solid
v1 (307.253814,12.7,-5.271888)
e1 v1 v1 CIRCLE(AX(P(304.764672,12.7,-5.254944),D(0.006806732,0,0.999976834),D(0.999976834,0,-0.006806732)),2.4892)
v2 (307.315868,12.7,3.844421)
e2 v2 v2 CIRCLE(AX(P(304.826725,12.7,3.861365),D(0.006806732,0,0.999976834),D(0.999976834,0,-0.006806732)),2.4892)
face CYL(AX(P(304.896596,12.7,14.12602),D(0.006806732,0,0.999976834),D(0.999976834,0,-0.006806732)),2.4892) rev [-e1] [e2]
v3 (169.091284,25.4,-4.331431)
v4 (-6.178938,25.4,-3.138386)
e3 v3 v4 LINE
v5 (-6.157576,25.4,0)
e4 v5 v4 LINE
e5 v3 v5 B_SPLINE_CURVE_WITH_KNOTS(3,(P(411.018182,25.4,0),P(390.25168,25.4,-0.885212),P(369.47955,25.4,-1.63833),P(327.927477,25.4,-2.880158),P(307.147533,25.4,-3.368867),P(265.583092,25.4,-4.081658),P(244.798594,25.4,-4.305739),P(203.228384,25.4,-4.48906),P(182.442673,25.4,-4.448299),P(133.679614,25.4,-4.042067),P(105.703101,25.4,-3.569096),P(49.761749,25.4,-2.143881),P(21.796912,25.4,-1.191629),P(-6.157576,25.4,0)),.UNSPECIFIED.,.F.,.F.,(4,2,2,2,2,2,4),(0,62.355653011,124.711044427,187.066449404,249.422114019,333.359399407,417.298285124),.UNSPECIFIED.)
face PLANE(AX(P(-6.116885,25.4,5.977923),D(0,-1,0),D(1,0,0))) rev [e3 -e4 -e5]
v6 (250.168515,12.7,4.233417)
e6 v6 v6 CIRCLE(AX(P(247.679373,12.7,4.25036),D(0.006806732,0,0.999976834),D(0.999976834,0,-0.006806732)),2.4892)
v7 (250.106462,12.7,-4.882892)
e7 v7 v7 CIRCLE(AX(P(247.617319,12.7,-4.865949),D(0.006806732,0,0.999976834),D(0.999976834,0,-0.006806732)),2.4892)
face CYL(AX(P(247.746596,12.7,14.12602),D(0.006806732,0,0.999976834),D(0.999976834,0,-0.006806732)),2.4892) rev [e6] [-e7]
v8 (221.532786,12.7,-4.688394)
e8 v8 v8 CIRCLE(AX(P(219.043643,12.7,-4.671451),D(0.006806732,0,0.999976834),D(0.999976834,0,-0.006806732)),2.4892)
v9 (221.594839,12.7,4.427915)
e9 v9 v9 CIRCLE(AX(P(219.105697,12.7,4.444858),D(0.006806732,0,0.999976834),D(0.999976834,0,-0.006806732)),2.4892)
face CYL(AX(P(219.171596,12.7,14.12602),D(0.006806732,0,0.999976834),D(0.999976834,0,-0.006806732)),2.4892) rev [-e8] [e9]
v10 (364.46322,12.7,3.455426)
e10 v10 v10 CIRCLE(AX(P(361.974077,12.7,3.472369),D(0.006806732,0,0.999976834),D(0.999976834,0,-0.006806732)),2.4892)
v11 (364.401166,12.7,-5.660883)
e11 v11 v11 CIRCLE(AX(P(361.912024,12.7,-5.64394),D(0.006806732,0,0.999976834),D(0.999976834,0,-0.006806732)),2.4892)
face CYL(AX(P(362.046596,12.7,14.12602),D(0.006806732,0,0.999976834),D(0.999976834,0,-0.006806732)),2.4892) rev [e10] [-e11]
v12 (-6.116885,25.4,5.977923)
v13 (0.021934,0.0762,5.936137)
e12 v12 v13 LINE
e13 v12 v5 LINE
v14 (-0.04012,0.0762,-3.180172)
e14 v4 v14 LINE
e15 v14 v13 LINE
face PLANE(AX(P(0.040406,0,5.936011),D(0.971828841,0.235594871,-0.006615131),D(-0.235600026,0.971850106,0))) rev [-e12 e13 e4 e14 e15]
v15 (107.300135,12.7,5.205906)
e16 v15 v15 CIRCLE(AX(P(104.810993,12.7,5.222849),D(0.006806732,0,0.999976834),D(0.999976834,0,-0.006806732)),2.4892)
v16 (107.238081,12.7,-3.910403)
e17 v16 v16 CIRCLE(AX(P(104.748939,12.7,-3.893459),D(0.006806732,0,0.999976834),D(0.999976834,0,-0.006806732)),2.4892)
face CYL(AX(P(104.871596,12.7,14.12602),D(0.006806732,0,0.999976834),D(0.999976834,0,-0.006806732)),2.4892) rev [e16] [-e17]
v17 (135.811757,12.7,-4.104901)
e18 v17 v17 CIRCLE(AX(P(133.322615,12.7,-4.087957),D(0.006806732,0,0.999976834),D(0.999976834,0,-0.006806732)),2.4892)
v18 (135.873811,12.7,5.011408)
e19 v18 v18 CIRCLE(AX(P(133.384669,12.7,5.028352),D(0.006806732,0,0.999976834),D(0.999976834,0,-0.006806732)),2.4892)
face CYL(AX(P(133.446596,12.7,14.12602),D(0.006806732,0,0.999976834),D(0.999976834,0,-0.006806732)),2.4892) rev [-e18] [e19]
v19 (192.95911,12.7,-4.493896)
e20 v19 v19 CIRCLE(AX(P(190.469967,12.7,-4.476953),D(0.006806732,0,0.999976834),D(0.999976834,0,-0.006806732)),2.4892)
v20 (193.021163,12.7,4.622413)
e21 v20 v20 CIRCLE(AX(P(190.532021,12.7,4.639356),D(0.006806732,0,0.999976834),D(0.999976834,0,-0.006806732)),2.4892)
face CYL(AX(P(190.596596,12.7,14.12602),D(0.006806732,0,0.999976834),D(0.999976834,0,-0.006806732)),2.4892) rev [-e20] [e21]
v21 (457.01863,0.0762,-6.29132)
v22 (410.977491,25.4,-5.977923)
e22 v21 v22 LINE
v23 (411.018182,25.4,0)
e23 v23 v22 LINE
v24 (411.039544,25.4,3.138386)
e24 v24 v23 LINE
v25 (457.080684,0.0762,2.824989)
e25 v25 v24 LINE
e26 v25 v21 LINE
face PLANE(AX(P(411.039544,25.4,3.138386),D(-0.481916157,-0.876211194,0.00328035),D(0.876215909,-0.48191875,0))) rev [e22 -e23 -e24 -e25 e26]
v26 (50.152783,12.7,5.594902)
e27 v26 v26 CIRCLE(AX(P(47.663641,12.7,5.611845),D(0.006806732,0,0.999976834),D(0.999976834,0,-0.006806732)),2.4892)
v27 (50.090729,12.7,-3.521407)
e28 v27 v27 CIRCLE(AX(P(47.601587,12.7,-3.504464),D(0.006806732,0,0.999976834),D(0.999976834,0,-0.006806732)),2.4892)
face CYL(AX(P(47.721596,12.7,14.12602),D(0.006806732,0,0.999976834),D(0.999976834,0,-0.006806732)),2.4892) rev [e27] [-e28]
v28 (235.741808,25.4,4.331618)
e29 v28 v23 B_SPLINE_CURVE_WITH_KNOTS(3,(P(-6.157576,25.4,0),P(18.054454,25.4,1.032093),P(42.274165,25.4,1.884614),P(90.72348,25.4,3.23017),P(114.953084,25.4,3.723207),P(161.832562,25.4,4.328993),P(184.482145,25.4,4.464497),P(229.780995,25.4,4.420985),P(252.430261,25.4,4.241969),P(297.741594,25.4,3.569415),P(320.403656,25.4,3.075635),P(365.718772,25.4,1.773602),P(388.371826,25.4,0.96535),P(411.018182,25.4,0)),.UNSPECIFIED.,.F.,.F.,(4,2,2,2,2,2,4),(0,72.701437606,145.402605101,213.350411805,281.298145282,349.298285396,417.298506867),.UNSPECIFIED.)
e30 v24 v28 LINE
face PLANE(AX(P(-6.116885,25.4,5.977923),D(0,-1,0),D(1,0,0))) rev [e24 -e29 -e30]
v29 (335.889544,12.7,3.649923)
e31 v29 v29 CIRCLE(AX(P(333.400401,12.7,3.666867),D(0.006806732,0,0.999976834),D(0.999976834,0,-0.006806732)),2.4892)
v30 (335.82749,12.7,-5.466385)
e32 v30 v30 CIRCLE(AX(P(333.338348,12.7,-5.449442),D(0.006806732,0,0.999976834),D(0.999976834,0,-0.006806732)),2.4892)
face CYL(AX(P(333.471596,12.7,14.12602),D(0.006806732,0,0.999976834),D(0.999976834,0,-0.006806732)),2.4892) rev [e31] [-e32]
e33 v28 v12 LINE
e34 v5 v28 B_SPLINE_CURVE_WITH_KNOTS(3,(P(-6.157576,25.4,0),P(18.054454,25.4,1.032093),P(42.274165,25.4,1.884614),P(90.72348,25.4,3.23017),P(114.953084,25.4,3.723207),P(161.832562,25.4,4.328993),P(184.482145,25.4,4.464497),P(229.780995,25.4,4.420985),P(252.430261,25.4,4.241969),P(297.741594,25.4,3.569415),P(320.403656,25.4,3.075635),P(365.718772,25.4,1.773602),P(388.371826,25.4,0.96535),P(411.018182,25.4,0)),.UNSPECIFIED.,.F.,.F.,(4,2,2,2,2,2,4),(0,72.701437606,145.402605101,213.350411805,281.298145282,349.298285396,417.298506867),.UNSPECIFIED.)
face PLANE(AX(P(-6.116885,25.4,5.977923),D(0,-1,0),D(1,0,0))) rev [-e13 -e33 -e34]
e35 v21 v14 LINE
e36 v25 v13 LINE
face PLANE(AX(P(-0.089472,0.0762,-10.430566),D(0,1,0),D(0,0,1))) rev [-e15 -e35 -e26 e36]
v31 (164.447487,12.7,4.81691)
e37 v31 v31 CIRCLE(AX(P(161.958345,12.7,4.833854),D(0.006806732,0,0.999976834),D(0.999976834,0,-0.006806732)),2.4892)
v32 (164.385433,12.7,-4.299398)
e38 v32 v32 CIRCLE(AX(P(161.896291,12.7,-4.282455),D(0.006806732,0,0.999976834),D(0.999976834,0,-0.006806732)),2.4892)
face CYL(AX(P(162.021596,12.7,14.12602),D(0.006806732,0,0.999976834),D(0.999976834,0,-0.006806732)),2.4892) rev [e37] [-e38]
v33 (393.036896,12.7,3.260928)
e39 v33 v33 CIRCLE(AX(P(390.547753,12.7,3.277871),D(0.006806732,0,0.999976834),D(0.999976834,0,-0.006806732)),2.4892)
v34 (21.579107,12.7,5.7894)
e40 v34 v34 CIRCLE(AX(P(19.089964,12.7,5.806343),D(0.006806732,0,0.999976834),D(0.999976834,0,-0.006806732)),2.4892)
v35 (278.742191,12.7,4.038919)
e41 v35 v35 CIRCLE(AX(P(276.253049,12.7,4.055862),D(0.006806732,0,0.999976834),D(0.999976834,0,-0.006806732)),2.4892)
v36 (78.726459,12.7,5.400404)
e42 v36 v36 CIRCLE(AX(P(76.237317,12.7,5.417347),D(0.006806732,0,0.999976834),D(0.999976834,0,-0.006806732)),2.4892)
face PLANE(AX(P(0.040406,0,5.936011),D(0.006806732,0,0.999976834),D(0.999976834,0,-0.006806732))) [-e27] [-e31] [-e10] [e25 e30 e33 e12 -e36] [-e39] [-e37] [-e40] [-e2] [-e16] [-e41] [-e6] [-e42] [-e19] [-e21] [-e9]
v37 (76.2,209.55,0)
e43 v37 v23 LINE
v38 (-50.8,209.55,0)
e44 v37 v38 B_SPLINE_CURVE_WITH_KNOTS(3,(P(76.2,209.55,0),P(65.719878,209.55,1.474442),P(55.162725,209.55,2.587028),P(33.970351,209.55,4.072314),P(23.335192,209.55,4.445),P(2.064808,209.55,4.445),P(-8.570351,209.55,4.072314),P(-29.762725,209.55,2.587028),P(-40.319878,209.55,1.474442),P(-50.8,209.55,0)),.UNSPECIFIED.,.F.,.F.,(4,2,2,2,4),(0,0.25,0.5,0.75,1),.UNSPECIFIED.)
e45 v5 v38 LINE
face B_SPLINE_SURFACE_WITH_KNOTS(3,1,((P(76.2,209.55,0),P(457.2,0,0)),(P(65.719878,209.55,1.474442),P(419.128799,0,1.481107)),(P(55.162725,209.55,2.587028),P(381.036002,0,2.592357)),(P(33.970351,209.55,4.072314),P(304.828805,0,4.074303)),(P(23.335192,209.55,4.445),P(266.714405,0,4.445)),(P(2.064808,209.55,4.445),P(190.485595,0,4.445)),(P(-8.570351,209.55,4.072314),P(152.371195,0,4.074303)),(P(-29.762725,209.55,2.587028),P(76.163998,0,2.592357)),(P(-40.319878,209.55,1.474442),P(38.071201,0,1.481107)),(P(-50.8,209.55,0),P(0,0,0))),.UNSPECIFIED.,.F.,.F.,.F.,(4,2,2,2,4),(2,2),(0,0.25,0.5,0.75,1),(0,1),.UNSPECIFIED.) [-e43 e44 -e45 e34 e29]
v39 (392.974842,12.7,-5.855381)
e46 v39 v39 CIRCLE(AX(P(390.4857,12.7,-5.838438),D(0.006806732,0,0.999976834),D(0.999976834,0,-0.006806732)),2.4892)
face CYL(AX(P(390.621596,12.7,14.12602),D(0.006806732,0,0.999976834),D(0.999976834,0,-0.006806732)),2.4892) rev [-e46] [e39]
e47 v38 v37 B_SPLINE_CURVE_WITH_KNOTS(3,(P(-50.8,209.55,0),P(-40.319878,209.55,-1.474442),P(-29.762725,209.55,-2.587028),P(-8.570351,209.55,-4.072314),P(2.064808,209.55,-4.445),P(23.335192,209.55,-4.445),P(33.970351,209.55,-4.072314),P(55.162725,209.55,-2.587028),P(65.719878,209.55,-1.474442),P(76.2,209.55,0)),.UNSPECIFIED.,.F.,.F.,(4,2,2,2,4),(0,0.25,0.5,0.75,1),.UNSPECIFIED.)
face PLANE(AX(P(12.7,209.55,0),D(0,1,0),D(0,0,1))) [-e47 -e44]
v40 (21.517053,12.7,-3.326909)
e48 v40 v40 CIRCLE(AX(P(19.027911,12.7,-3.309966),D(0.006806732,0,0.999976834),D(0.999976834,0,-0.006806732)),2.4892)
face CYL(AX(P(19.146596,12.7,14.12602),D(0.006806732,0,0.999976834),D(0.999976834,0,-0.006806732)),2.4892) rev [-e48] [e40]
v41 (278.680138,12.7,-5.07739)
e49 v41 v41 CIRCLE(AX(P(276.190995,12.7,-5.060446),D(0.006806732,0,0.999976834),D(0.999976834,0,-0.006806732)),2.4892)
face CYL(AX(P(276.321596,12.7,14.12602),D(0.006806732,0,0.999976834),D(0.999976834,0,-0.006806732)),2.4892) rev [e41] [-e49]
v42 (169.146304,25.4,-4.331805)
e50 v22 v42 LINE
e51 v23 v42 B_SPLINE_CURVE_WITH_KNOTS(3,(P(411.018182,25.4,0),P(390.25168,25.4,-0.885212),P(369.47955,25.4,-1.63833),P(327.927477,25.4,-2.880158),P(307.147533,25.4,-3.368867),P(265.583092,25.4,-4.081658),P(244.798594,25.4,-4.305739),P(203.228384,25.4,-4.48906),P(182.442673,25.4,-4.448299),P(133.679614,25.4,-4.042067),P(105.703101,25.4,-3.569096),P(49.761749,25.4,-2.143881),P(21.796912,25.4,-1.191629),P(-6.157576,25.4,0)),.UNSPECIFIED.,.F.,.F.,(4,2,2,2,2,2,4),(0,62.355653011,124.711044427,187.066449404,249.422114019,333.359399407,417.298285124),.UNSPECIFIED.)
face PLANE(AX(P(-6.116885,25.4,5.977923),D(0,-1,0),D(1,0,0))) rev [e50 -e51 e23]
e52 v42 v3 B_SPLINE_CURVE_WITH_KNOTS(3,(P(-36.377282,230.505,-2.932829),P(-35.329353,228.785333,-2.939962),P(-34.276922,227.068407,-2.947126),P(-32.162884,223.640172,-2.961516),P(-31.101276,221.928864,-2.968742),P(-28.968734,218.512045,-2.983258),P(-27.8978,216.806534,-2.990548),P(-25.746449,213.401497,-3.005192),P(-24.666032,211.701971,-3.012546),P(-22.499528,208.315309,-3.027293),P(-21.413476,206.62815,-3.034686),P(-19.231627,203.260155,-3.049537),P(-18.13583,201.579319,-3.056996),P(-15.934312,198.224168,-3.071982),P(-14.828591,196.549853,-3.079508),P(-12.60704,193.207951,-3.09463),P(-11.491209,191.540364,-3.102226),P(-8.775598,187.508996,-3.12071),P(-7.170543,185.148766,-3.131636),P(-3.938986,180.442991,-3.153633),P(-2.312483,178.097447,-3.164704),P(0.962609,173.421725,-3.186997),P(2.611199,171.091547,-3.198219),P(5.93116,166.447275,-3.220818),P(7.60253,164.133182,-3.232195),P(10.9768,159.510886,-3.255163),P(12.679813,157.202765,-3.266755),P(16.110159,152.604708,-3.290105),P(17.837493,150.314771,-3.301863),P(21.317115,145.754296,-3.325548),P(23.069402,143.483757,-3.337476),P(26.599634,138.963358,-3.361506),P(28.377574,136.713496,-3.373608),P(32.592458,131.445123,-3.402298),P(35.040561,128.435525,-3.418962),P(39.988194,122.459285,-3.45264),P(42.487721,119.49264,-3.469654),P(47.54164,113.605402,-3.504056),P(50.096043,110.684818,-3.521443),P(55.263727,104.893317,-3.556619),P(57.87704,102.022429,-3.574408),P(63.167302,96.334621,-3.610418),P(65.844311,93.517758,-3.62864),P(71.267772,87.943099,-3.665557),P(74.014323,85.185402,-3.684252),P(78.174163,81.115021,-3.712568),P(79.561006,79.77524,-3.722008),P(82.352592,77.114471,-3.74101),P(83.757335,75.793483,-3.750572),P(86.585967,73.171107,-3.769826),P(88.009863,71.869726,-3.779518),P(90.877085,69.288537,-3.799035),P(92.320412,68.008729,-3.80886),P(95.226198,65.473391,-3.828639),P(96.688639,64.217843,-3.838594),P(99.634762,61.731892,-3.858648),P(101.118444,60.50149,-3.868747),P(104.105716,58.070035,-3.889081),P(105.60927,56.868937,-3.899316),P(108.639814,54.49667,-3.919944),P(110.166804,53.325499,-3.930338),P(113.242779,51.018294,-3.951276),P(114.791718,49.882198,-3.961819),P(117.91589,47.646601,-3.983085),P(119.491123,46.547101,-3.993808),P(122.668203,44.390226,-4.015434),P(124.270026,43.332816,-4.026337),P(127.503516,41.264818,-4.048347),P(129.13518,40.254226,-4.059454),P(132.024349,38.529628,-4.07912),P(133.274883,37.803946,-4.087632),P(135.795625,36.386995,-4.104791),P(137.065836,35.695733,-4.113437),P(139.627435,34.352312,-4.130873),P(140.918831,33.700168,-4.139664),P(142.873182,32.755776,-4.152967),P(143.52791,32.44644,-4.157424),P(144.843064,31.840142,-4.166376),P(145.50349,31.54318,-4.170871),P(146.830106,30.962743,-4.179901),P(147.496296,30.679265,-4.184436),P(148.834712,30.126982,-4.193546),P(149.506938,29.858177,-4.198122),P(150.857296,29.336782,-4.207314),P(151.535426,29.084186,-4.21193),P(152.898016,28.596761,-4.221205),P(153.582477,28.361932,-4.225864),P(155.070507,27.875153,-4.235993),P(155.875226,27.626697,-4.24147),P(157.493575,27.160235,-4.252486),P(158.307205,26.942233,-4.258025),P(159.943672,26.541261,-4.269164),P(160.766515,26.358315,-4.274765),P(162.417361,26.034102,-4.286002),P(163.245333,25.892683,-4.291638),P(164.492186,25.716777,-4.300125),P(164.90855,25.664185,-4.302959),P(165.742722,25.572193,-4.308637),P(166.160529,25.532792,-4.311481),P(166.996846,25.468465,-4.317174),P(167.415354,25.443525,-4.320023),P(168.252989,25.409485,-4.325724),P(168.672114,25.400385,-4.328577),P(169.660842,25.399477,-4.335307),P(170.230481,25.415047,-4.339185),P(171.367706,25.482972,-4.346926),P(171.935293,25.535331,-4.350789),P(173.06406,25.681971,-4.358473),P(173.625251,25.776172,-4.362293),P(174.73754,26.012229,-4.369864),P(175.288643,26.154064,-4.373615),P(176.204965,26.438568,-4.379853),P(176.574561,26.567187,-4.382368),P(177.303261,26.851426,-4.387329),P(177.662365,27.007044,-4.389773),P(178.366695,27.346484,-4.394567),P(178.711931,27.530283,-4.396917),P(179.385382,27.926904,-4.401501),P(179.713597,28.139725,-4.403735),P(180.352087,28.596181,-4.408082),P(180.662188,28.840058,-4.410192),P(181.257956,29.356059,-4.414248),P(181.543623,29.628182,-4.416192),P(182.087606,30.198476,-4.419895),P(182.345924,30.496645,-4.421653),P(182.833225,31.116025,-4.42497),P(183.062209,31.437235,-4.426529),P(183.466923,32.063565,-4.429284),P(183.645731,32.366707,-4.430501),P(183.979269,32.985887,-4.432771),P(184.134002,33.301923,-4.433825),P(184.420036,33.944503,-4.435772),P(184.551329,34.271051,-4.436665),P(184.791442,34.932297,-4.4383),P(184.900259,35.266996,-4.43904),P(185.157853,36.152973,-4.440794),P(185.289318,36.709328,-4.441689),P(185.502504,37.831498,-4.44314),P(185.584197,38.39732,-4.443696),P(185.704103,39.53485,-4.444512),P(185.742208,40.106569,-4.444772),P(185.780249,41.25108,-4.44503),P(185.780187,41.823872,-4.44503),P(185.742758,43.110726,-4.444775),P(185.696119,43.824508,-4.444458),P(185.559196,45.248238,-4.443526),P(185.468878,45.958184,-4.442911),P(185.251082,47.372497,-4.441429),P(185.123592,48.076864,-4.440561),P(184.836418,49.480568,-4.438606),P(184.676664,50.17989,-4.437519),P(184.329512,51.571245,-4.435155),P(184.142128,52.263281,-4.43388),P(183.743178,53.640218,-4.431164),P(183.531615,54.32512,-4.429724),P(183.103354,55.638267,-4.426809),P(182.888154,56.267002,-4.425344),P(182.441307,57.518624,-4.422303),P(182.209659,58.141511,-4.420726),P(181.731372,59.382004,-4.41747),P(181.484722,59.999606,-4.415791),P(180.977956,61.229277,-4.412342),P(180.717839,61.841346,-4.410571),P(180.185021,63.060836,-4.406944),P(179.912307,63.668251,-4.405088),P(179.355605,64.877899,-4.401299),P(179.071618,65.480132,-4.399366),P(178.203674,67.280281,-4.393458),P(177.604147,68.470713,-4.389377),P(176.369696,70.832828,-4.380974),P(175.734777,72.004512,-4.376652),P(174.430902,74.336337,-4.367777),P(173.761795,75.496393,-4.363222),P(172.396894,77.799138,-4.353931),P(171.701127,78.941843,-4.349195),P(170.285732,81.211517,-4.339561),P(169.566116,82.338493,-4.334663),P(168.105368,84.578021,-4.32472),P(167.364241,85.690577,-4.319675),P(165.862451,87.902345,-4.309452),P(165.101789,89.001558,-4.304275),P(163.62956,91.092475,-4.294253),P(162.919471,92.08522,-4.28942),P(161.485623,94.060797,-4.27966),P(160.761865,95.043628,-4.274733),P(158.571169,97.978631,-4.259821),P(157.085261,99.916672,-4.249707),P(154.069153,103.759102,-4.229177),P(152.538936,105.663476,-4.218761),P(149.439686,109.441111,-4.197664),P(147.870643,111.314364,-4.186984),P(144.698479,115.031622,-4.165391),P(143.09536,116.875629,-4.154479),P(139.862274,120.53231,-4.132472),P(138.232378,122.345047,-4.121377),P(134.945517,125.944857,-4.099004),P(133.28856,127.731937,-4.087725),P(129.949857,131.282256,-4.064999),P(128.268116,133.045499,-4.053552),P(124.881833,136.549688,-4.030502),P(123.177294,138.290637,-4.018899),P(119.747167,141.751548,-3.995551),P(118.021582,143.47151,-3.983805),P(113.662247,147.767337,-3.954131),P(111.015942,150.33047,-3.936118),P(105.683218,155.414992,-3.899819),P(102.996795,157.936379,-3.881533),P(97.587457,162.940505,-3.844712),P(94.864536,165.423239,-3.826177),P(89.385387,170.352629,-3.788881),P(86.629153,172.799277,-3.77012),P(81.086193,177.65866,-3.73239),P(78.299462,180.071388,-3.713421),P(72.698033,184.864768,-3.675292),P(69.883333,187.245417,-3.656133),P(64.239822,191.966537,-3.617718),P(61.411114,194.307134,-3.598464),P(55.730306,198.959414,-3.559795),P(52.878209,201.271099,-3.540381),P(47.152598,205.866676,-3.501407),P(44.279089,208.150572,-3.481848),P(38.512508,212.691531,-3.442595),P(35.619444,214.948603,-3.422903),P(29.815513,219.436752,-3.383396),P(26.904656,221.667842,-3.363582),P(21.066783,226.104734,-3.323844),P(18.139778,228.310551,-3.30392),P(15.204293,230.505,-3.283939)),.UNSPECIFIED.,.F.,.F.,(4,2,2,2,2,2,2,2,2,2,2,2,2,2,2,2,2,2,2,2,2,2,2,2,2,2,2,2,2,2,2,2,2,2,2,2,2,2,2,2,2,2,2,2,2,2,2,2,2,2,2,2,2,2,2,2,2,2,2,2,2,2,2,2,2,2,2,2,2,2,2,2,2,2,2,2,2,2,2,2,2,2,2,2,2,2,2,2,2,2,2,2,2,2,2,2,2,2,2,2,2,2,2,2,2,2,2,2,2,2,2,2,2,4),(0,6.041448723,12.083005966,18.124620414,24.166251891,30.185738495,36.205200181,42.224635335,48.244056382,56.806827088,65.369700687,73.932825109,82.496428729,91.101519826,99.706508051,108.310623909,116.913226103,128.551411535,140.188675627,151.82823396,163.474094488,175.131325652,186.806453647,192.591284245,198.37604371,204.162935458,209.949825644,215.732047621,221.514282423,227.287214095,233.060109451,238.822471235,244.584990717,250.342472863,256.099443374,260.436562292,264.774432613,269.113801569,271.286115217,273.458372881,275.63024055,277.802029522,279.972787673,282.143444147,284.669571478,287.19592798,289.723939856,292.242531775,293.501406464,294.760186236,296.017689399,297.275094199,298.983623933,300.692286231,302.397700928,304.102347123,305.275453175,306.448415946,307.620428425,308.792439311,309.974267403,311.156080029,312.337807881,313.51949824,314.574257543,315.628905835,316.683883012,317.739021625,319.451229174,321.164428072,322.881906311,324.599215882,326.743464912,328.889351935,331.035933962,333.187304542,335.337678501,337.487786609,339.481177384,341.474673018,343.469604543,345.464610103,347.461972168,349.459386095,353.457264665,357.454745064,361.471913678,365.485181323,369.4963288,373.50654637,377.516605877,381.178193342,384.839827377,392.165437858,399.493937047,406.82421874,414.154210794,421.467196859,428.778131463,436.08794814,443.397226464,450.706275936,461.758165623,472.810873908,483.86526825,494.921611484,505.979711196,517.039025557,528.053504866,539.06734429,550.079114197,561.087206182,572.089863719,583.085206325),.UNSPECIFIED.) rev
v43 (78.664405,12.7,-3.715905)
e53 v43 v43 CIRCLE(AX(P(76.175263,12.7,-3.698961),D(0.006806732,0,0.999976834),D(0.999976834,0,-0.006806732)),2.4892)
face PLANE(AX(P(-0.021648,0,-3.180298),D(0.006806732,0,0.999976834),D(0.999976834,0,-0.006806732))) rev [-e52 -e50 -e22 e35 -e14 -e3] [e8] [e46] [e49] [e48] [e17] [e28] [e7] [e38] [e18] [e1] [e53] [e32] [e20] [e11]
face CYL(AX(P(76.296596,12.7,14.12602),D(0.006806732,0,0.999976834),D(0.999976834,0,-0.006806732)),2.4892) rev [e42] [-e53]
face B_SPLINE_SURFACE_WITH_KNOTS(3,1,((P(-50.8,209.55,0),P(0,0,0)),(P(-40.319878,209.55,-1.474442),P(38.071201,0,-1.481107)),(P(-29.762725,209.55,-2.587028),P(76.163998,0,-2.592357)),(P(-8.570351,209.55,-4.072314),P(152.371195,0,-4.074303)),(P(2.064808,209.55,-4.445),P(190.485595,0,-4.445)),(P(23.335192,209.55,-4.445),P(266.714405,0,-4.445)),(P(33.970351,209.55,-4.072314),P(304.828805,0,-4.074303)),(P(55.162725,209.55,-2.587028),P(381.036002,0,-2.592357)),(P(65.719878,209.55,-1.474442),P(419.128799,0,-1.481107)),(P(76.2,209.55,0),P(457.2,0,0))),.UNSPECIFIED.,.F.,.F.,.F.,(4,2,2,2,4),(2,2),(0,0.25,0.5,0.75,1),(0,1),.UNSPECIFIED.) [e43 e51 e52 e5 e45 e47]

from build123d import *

# Parameters (mm, degrees)
BOSS_EXTRUDE1_DEPTH     = 9.116519994
CUT_EXTRUDE1_DEPTH      = 503.991265391
CUT_EXTRUDE1_DEPTH_BACK = 503.991265391
SKETCH12_W              = 6.35
SKETCH12_H              = 25.4
F_10_CLEARANCE_HOLE1_D  = 4.9784
LPATTERN1_START         = -3.180371244
LPATTERN1_OUTLINE_R     = 2.4892
LPATTERN1_DEPTH         = 9.116519994
SKETCH14_W              = 457.207880774
SKETCH14_H              = 25.4
CUT_EXTRUDE2_DEPTH      = 504.063817152


# Read off the part's stored shape, not the designer's step: LPattern1
with BuildPart() as part:
    # Sketch5 for Loft4 → Loft4 section 0
    with BuildSketch(Plane(origin=(0, 209.55, 0), x_dir=(1, 0, 0), z_dir=(0, 1, 0))):
        with BuildLine():
            # circular arc as an exact rational Bezier (weights 1, cos(half-angle), 1)
            Bezier((-50.8, 0), (12.7, 8.9337755), (76.2, 0), weights=[1, 0.990247786, 1])
            Bezier((76.2, 0), (12.7, -8.9337755), (-50.8, 0), weights=[1, 0.990247786, 1])
        make_face()
    # Sketch1 for Loft4 → Loft4 section 1
    with BuildSketch(Plane(origin=(0, 0, 0), x_dir=(1, 0, 0), z_dir=(0, 1, 0))):
        with BuildLine():
            Bezier((0, 0), (228.6, 8.89336246), (457.2, 0), weights=[1, 0.999244113, 1])
            Bezier((457.2, 0), (228.6, -8.89336246), (0, 0), weights=[1, 0.999244113, 1])
        make_face()
    loft()

    # Sketch10 → Boss-Extrude1 (add)
    with BuildSketch(Plane(origin=(-0.021647933, 0, -3.180297568), x_dir=(0, -1, 0), z_dir=(0.006806731520561807, 0, 0.9999768339346702))):
        Polygon((0, 457.189408475), (0, 0), (-25.4, -6.157433111), (-25.4, 411.008660144), align=None)
    extrude(amount=BOSS_EXTRUDE1_DEPTH)

    # Sketch12 → Cut-Extrude1 (cut, two sides: drawn at the far end of the back side and taken through both)
    with BuildSketch(Plane(origin=(0, 0, 0), x_dir=(0.006806731520561808, 0, 0.9999768339346703), z_dir=(-0.9999768339346703, 0, 0.006806731520561808)).offset(-CUT_EXTRUDE1_DEPTH_BACK)):
        with Locations((9.11114875, 12.7)):
            Rectangle(SKETCH12_W, SKETCH12_H)
        with Locations((-6.355371244, 12.7)):
            Rectangle(SKETCH12_W, SKETCH12_H)
    extrude(amount=CUT_EXTRUDE1_DEPTH + CUT_EXTRUDE1_DEPTH_BACK, mode=Mode.SUBTRACT)

    # #10 Clearance Hole1 (through all)
    with Locations(Plane(origin=(0.097036893, 0, 14.25568857), x_dir=(0, -1, 0), z_dir=(0.006806731520561807, 0, 0.9999768339346702))):
        with Locations((-12.7, 19.05)):
            Hole(F_10_CLEARANCE_HOLE1_D / 2)

    # LPattern1 outline → LPattern1 (cut)
    with BuildSketch(Plane(origin=(0, 0, 0), x_dir=(0.9999768339346702, 0, -0.006806731520561811), z_dir=(0.006806731520561811, 0, 0.9999768339346702)).offset(LPATTERN1_START)):
        with Locations((47.62433803, 12.7)):
            Circle(LPATTERN1_OUTLINE_R)
        with Locations((76.198676059, 12.7)):
            Circle(LPATTERN1_OUTLINE_R)
        with Locations((104.773014089, 12.7)):
            Circle(LPATTERN1_OUTLINE_R)
        with Locations((133.347352119, 12.7)):
            Circle(LPATTERN1_OUTLINE_R)
        with Locations((161.921690148, 12.7)):
            Circle(LPATTERN1_OUTLINE_R)
        with Locations((190.496028178, 12.7)):
            Circle(LPATTERN1_OUTLINE_R)
        with Locations((219.070366208, 12.7)):
            Circle(LPATTERN1_OUTLINE_R)
        with Locations((247.644704237, 12.7)):
            Circle(LPATTERN1_OUTLINE_R)
        with Locations((276.219042267, 12.7)):
            Circle(LPATTERN1_OUTLINE_R)
        with Locations((304.793380297, 12.7)):
            Circle(LPATTERN1_OUTLINE_R)
        with Locations((333.367718327, 12.7)):
            Circle(LPATTERN1_OUTLINE_R)
        with Locations((361.942056356, 12.7)):
            Circle(LPATTERN1_OUTLINE_R)
        with Locations((390.516394386, 12.7)):
            Circle(LPATTERN1_OUTLINE_R)
    extrude(amount=LPATTERN1_DEPTH, mode=Mode.SUBTRACT)

    # Sketch14 → Cut-Extrude2 (cut, through all)
    with BuildSketch(Plane(origin=(0.040405771, 0, 5.936011232), x_dir=(0.9999768339346702, 0, -0.006806731520561792), z_dir=(0.006806731520561792, 0, 0.9999768339346703))):
        with Locations((228.585468088, -12.6238)):
            Rectangle(SKETCH14_W, SKETCH14_H)
    extrude(amount=-CUT_EXTRUDE2_DEPTH, mode=Mode.SUBTRACT)


solid = part.part
